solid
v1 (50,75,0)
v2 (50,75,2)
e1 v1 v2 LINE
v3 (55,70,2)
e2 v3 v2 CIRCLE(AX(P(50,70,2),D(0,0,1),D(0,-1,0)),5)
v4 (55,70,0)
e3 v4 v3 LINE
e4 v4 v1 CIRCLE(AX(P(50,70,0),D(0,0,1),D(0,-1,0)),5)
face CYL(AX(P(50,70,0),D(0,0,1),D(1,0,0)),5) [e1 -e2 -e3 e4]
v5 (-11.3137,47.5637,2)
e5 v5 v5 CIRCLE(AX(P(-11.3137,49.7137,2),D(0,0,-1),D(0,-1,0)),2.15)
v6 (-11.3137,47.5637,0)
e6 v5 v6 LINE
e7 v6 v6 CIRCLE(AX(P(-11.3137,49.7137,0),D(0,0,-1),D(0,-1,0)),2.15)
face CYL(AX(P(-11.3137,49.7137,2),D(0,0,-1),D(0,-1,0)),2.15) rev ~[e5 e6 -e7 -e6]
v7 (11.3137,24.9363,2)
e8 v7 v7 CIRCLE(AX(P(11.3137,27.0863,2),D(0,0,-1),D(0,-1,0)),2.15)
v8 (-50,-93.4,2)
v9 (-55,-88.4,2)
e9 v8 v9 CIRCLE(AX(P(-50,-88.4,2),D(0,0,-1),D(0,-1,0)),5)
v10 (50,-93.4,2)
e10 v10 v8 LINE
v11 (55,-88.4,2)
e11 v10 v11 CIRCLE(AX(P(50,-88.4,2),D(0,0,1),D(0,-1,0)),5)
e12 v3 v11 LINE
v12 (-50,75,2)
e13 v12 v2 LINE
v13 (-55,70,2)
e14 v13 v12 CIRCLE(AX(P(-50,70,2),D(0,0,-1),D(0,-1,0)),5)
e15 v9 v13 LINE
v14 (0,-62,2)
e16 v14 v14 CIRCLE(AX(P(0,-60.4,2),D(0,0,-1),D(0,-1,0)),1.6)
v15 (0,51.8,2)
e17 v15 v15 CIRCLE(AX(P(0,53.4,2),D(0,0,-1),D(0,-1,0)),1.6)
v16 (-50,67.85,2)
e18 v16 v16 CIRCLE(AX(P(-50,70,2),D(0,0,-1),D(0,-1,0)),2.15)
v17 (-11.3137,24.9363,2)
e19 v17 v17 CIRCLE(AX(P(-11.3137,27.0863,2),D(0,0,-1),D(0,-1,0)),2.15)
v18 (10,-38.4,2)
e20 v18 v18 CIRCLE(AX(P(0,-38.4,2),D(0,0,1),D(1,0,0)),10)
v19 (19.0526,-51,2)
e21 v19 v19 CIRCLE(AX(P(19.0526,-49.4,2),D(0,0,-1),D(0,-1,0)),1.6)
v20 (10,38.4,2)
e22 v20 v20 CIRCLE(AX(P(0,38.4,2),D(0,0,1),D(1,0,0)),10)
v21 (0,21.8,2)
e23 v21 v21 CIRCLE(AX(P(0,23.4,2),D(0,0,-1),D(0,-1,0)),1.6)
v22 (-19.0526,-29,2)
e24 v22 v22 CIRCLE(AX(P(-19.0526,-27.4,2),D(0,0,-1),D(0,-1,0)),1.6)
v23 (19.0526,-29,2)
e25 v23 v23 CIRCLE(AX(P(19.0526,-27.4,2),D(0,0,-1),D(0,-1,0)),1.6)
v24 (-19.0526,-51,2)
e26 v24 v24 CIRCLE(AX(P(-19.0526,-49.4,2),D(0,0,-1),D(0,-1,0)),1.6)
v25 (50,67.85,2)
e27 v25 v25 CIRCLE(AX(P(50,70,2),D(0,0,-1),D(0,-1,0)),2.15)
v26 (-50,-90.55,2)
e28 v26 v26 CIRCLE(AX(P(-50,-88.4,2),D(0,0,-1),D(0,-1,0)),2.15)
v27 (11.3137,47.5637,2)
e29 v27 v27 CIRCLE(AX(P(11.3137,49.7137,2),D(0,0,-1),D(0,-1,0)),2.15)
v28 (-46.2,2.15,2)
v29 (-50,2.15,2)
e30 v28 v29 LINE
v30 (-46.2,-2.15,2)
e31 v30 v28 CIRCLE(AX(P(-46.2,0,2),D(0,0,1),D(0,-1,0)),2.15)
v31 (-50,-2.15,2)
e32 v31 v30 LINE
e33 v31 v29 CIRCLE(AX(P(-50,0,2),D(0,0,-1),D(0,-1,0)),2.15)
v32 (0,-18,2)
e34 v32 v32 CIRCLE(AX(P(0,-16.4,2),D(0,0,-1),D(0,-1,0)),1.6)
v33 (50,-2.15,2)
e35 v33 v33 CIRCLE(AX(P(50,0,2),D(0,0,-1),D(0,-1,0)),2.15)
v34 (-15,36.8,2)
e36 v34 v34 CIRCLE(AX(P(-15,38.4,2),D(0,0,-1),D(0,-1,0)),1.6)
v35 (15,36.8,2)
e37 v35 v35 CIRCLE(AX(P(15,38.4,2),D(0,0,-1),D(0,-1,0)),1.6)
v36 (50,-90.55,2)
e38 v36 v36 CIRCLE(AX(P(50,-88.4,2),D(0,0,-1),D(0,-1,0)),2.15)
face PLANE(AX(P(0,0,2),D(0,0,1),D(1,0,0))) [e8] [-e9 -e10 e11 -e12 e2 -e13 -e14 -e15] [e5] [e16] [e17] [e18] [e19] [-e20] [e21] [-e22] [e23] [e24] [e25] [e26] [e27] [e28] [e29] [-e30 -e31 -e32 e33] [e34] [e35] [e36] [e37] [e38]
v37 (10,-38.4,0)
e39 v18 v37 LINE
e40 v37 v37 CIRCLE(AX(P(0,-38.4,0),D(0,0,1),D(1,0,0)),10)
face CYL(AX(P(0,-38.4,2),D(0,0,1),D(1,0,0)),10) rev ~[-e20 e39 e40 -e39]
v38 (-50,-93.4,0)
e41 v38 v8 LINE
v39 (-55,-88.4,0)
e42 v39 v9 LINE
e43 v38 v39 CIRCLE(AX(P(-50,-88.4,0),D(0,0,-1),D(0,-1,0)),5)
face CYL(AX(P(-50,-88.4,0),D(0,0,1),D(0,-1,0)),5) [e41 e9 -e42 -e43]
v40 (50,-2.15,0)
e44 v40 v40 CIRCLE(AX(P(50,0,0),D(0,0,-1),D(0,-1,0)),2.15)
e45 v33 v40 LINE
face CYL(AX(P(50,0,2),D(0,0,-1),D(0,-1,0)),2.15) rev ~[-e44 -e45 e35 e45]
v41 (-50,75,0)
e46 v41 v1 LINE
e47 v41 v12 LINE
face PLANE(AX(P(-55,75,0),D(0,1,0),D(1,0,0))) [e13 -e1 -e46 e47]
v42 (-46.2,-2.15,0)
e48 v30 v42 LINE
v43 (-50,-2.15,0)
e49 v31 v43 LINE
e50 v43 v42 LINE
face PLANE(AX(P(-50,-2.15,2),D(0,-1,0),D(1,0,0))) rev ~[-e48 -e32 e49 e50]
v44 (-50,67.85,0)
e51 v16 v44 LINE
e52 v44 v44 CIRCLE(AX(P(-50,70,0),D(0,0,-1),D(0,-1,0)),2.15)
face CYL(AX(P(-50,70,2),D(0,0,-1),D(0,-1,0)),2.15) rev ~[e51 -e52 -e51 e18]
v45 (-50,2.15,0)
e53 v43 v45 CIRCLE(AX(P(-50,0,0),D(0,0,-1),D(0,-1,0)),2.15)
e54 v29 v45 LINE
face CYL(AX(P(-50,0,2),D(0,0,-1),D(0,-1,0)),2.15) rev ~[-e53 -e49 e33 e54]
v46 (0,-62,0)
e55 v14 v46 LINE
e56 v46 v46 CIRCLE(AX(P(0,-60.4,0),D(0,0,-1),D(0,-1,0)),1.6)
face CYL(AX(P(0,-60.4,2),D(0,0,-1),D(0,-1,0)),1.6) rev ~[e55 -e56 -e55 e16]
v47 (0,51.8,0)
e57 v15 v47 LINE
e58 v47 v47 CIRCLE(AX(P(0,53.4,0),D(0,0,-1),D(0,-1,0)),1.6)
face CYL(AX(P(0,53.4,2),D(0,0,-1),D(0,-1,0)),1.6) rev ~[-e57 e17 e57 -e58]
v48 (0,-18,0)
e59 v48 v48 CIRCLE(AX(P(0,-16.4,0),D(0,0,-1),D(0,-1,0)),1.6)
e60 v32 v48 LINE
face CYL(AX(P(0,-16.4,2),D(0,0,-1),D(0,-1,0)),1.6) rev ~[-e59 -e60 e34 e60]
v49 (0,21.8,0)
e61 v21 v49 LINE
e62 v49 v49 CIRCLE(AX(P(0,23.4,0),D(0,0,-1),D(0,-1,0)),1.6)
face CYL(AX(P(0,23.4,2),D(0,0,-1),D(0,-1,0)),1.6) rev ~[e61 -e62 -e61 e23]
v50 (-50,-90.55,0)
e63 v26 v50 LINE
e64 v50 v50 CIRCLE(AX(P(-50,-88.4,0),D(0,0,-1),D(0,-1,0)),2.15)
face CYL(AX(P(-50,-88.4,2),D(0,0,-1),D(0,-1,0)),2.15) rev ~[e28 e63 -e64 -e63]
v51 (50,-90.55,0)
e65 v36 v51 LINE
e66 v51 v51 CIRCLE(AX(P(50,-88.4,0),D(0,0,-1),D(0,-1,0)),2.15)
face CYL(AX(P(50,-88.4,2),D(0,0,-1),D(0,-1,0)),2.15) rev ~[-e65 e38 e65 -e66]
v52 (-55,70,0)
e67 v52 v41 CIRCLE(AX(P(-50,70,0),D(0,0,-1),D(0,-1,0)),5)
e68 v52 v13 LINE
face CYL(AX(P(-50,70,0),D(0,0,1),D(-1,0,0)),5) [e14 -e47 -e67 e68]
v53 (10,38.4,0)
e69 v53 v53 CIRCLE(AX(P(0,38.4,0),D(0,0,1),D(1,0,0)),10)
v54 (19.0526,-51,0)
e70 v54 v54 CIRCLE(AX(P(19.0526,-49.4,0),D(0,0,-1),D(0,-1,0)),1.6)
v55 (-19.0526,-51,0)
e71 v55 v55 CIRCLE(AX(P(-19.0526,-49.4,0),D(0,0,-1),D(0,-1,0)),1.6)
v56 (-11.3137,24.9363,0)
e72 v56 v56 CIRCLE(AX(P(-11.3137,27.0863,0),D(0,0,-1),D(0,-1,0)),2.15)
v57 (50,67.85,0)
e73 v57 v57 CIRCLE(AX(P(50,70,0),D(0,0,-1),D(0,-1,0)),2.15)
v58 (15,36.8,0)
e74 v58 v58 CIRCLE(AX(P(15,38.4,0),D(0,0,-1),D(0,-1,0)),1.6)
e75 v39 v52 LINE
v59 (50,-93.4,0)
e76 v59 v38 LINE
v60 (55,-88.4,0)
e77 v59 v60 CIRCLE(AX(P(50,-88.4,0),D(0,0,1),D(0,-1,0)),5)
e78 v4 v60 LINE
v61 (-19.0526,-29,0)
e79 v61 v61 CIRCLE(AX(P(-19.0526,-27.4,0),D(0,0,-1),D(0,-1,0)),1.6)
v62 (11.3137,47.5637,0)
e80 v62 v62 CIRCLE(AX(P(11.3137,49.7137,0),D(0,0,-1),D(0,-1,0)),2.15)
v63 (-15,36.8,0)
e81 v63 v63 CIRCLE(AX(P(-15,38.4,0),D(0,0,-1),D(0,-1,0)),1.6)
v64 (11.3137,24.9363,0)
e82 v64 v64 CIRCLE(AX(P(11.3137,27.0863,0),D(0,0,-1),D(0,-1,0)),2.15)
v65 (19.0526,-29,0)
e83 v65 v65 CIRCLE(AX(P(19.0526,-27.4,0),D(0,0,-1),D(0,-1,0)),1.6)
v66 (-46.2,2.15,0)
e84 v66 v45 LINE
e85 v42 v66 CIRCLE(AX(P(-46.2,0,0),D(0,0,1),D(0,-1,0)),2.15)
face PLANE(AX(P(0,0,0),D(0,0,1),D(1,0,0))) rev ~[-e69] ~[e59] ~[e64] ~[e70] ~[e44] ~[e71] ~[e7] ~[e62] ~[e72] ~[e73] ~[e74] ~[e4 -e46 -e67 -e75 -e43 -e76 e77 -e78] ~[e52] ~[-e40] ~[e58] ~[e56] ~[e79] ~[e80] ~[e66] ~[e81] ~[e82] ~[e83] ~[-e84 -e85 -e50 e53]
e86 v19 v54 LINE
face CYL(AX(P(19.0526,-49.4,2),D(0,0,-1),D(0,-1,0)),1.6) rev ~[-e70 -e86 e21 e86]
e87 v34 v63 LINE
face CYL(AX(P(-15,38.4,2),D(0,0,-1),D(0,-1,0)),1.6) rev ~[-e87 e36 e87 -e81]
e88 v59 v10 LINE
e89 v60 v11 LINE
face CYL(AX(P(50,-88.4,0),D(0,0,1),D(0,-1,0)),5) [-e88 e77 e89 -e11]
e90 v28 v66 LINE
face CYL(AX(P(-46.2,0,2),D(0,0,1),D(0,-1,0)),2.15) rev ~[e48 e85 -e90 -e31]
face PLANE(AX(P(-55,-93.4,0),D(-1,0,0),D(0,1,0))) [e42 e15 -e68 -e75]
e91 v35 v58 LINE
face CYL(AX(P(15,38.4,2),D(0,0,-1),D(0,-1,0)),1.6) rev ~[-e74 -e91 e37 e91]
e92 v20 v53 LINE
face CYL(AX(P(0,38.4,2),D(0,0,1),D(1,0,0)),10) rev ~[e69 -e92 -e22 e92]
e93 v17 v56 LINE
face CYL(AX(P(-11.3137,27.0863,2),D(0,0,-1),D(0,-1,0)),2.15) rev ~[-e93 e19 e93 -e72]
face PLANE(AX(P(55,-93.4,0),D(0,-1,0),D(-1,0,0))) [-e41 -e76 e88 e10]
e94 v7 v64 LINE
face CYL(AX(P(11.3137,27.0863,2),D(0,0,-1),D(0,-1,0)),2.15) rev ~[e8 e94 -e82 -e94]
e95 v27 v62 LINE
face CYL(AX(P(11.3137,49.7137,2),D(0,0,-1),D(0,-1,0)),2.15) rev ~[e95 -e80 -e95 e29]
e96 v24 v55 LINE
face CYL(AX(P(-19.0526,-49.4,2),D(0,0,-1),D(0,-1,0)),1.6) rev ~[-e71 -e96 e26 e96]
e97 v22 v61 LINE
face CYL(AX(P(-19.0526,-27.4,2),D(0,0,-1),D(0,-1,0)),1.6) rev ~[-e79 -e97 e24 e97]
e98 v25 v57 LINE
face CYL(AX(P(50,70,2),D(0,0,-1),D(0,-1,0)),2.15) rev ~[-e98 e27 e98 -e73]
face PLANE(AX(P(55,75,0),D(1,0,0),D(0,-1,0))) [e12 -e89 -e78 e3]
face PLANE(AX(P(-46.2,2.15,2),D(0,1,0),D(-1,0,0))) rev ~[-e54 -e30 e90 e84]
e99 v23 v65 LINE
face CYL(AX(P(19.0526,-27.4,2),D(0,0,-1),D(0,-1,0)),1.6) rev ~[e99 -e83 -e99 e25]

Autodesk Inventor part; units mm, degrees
ref_plane "YZ Plane" through (0, 0, 0) normal (1, 0, 0) x (0, 1, 0)
ref_plane "XZ Plane" through (0, 0, 0) normal (0, 1, 0) x (-1, 0, 0)
ref_plane "XY Plane" through (0, 0, 0) normal (0, 0, 1) x (1, 0, 0)
sketch "スケッチ1" plane through (0, 0, 0) normal (0, 0, 1) x (1, 0, 0)
  line L0 (55, -93.4) -> (-55, -93.4)
  line L1 (-55, -93.4) -> (-55, 75)
  line L2 (-55, 75) -> (55, 75)
  line L3 (55, 75) -> (55, -93.4)
  line L4 (55, -93.4) -> (-55, 75) construction
  line L5 (-55, -93.4) -> (55, 75) construction
  point P0 (0, 0)
  point P1 (0, -9.2)
  point P2 (0, -9.2)
  dimension "d50" = 93.4
  dimension "d51" = 110
  dimension "d52" = 75
extrude "プレート1" add sketch "スケッチ1" along normal blind 2
sketch "スケッチ3" plane through (0, 0, 2) normal (0, 0, 1) x (1, 0, 0)
  circle A0 centre (0, 38.4) radius 10
  circle A1 centre (0, -38.4) radius 10
  point P0 (0, 0)
  dimension "d22" = 20
  dimension "d53" = 20
  dimension "d55" = 76.8
  dimension "d56" = 38.4
extrude "押し出し1" cut sketch "スケッチ3" against normal blind 10 contours A0
sketch "スケッチ2" plane through (0, 0, 2) normal (0, 0, 1) x (1, 0, 0)
  circle A0 centre (0, 38.4) radius 15 construction
  circle A1 centre (0, -38.4) radius 22
  point P0 (0, 0)
  point P1 (0, 53.4)
  point P2 (-15, 38.4)
  point P3 (0, 23.4)
  point P4 (15, 38.4)
  point P5 (0, -16.4)
  point P6 (-19.0526, -27.4)
  point P7 (-19.0526, -49.4)
  point P8 (0, -60.4)
  point P9 (19.0526, -49.4)
  point P10 (19.0526, -27.4)
  dimension "d3" = 30
  dimension "d8" = 44
  dimension "d6" = 360
  dimension "d11" = 360
  dimension "d13" = 76.8
  dimension "d14" = 38.4
hole "穴1" at (0, 53.4, 2) at (-15, 38.4, 2) at (0, 23.4, 2) at (15, 38.4, 2) at (0, -16.4, 2) at (-19.0526, -27.4, 2) at (-19.0526, -49.4, 2) at (0, -60.4, 2) at (19.0526, -27.4, 2) at (19.0526, -49.4, 2) direction (0, 0, -1) diameter 3.2 end through all clearance for "Socket Head Cap Screw" size "M3" standard "Ansi Metric M Profile"
sketch "スケッチ4" plane through (0, 0, 2) normal (0, 0, 1) x (1, 0, 0)
  line L0 (55, -93.4) -> (-55, -93.4) projected
  line L1 (-55, -93.4) -> (-55, 75) projected
  line L2 (55, 75) -> (55, -93.4) projected
  line L3 (-55, 75) -> (55, 75) projected
  line L4 (-50, 70) -> (-50, -88.4)
  line L5 (-50, -88.4) -> (50, -88.4)
  line L6 (50, -88.4) -> (50, 70)
  line L7 (50, 70) -> (-50, 70)
  point P0 (-50, 0)
  point P1 (50, 0)
  point P2 (0, 0)
  dimension "d57" = 5
hole "穴2" at (-50, -88.4, 2) at (50, -88.4, 2) at (50, 70, 2) at (-50, 70, 2) at (-50, 0, 2) at (50, 0, 2) direction (0, 0, -1) diameter 4.3 end through all clearance for "Socket Head Cap Screw" size "M4" standard "Ansi Metric M Profile"
fillet "コーナーR1" radius 5 4 edges at (-55, -93.4, 1) (55, -93.4, 1) (55, 75, 1) (-55, 75, 1)
sketch "スケッチ5" plane through (0, 0, 2) normal (0, 0, 1) x (1, 0, 0)
  circle A0 centre (0, -38.4) radius 10
  point P0 (0, 0)
  dimension "d35" = 20
extrude "押し出し2" cut sketch "スケッチ5" against normal blind 10
sketch "スケッチ6" plane through (0, 0, 2) normal (0, 0, 1) x (1, 0, 0)
  circle A0 centre (0, 38.4) radius 10 projected
  circle A1 centre (0, 38.4) radius 16
  point P0 (0, 0)
  point P1 (-11.3137, 49.7137)
  point P2 (-11.3137, 27.0863)
  point P3 (11.3137, 27.0863)
  point P4 (11.3137, 49.7137)
  dimension "d38" = 32
  dimension "d41" = 360
hole "穴3" at (-11.3137, 49.7137, 2) at (-11.3137, 27.0863, 2) at (11.3137, 27.0863, 2) at (11.3137, 49.7137, 2) direction (0, 0, -1) diameter 4.3 end through all clearance for "Socket Head Cap Screw" size "M4" standard "Ansi Metric M Profile"
sketch "スケッチ7" plane through (0, 0, 2) normal (0, 0, 1) x (1, 0, 0)
  line L0 (-46.2, 0) -> (-50, 0) construction
  line L1 (-46.2, 2.15) -> (-50, 2.15)
  line L2 (-50, -2.15) -> (-46.2, -2.15)
  arc A0 (-46.2, -2.15) -> (-46.2, 2.15) centre (-46.2, 0) ccw
  arc A1 (-50, 2.15) -> (-50, -2.15) centre (-50, 0) ccw
  circle A2 centre (-50, 0) radius 2.15 projected
  point P0 (0, 0)
  point P1 (-48.1, 0)
  dimension "d58" = 48.1
extrude "押し出し3" cut sketch "スケッチ7" against normal blind 10
equation "\"d56\" = 0.5 * d55"
equation "\"d14\" = 0.5 * d13"
equation "\"d20\" = Thickness"
equation "\"d2\" = Thickness"
equation "\"BendRadius\" = Thickness"
equation "\"BendReliefWidth\" = Thickness"
equation "\"BendReliefDepth\" = 0.5 * Thickness"
equation "\"CornerReliefSize\" = 4 * Thickness"
equation "\"MinimumRemnant\" = 2 * Thickness"
equation "\"TransitionRadius\" = BendRadius"
equation "\"JacobiRadiusSize\" = BendRadius"
equation "\"GapSize\" = Thickness"
equation "\"Thickness\" = 2"
properties part number "carbonplate1" material "CFRP"
